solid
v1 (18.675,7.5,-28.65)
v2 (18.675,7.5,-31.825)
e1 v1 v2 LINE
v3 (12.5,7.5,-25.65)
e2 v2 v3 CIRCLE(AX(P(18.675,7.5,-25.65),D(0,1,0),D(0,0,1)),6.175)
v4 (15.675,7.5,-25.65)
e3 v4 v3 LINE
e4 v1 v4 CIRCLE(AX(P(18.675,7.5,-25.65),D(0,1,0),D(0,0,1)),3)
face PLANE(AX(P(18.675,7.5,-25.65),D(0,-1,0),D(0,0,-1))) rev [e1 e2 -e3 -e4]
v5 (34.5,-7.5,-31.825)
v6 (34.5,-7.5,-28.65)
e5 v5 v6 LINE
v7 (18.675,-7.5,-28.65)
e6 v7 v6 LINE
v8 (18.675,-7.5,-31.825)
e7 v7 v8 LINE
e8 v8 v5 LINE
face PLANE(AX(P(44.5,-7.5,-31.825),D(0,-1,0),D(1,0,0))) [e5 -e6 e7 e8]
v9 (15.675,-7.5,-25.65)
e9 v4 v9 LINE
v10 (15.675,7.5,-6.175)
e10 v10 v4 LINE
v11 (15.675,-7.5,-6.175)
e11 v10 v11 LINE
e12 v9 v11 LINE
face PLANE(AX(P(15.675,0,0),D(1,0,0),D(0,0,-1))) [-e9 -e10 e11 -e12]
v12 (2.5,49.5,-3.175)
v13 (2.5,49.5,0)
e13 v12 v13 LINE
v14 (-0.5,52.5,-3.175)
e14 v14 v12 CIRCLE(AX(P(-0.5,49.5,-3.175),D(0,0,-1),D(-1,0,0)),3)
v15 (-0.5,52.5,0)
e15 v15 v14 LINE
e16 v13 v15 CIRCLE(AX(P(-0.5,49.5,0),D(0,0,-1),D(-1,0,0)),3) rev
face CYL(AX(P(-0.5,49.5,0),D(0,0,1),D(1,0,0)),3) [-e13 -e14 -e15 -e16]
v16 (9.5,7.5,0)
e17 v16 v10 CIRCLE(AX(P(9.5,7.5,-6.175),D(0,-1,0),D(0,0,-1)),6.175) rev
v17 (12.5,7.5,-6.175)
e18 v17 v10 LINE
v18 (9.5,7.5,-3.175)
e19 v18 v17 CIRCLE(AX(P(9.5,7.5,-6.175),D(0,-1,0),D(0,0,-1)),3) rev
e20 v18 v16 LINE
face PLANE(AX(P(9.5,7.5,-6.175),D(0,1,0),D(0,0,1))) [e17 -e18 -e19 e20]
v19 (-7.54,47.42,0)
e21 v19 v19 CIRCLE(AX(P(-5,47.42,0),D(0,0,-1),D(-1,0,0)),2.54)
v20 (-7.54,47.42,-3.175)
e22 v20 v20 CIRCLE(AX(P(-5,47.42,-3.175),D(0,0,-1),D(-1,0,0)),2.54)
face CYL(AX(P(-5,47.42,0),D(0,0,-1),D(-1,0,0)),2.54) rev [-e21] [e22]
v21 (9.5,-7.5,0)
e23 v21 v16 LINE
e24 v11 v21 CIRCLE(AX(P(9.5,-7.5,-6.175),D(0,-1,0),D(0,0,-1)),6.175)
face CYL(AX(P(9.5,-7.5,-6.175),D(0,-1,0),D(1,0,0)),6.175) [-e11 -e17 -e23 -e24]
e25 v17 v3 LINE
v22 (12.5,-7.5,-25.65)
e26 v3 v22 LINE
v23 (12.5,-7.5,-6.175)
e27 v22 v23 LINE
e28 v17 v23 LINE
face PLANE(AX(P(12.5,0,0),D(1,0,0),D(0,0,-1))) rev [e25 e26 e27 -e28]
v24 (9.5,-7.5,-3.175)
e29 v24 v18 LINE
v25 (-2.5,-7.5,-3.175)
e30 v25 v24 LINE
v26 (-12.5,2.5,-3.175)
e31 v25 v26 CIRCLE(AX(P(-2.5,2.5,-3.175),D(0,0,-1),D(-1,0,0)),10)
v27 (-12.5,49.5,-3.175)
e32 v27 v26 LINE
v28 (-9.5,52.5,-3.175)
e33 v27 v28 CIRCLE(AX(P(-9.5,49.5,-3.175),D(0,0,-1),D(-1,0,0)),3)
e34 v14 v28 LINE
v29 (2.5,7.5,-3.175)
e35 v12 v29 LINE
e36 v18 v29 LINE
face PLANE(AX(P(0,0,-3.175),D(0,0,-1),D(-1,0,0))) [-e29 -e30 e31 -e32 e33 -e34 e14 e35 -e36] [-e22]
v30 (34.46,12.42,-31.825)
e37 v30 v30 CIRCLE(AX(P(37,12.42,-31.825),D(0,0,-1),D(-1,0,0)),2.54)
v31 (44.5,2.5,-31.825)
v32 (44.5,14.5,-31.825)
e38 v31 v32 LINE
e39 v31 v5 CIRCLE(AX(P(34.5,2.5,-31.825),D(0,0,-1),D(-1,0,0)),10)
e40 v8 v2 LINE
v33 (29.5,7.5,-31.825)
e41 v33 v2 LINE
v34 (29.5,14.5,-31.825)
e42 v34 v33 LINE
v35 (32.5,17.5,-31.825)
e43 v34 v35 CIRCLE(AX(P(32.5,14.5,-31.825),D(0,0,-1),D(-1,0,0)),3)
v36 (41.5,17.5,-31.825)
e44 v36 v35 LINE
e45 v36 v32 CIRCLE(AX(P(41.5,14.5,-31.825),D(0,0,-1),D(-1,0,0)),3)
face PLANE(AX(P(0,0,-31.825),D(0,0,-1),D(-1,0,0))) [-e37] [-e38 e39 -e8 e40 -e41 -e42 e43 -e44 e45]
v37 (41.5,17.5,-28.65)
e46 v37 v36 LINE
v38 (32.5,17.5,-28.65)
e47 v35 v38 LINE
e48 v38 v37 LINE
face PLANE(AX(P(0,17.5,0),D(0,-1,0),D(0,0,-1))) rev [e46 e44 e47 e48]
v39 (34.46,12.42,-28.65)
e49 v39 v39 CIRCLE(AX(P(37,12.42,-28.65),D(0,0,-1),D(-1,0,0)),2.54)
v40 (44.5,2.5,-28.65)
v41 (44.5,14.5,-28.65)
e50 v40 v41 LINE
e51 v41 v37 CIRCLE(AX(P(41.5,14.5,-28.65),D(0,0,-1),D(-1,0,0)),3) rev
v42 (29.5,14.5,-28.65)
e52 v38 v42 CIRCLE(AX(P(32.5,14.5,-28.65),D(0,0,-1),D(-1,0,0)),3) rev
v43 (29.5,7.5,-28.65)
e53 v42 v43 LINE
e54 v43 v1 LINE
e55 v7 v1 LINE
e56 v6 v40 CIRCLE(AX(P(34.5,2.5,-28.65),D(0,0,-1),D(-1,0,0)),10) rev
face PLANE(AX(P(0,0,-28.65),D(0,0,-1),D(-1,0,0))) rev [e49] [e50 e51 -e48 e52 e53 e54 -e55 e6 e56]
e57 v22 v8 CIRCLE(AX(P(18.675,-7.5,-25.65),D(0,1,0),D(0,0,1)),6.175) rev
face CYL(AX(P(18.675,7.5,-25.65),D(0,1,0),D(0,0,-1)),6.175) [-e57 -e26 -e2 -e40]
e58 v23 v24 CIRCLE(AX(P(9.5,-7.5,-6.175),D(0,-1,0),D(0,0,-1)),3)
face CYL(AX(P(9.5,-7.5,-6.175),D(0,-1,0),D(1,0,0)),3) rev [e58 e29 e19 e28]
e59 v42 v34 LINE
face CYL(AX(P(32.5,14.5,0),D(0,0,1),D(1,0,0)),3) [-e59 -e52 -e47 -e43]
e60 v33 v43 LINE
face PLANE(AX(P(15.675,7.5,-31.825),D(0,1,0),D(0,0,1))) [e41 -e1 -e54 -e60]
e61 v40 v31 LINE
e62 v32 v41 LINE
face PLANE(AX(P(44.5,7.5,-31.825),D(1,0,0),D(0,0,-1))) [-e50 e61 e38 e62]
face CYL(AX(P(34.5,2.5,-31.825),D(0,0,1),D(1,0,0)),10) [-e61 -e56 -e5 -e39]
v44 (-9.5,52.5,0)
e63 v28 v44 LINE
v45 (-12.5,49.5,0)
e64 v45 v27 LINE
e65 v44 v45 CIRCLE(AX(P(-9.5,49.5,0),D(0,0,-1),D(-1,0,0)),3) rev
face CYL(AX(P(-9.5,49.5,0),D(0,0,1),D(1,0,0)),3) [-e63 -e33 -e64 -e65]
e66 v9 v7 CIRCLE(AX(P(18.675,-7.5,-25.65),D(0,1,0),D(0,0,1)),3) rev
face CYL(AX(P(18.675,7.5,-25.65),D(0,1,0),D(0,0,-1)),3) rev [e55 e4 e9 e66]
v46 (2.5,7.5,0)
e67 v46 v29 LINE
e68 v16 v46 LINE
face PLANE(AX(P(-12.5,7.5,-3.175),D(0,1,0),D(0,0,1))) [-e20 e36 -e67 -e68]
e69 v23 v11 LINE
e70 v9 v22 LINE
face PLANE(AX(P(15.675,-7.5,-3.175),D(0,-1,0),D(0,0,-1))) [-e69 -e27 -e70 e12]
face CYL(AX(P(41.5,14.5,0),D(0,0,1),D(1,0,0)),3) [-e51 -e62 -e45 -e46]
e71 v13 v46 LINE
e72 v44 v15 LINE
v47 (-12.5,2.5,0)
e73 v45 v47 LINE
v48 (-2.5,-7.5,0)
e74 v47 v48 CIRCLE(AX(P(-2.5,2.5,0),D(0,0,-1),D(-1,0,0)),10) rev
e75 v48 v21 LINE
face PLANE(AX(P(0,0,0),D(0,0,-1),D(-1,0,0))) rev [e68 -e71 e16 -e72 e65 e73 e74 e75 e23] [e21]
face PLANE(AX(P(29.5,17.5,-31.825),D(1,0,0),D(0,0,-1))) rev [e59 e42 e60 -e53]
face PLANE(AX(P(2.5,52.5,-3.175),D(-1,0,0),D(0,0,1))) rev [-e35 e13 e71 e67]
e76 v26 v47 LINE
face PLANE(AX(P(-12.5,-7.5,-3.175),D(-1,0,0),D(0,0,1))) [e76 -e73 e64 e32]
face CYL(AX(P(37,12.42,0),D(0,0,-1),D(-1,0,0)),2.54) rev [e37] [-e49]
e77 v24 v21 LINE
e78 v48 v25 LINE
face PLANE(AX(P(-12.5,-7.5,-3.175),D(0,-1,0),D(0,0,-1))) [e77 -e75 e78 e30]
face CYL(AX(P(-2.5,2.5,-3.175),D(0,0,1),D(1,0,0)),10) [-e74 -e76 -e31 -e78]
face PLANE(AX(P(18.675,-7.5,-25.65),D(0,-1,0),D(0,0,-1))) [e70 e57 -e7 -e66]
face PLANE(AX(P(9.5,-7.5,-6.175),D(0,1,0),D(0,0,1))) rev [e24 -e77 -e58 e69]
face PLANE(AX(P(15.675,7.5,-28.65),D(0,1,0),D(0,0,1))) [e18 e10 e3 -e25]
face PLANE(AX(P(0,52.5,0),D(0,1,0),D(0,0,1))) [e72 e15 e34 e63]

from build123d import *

# Parameters (mm, degrees)
SKETCH1_W                    = 25
SKETCH1_H                    = 15
BASE_FLANGE1_DEPTH           = 3.175
EDGE_FLANGE1_STRIP_W         = 18.7
EDGE_FLANGE1_STRIP_H         = 3.175
EDGE_FLANGE1_STRIP_CUT_DEPTH = 15
EDGE_FLANGE1_DEPTH           = 15
EDGE_FLANGE2_STRIP_W         = 18.7
EDGE_FLANGE2_STRIP_H         = 3.175
EDGE_FLANGE2_STRIP_CUT_DEPTH = 15
EDGE_FLANGE2_DEPTH           = 15
SKETCH12_W                   = 15
SKETCH12_H                   = 3.175
BOSS_EXTRUDE1_DEPTH          = 45
SKETCH15_R                   = 2.54
CUT_EXTRUDE2_DEPTH           = 75.547451331
SKETCH19_W                   = 15
SKETCH19_H                   = 3.175
BOSS_EXTRUDE2_DEPTH          = 10
SKETCH21_R                   = 2.54
CUT_EXTRUDE3_DEPTH           = 76.824340584
FILLET2_R                    = 3
FILLET3_R                    = 10


# Sheet-metal steps are written as plain solids
with BuildPart() as part:
    # Sketch1 → Base-Flange1 (new body)
    with BuildSketch(Plane.XY):
        Rectangle(SKETCH1_W, SKETCH1_H)
    extrude(amount=-BASE_FLANGE1_DEPTH)

    # Edge-Flange1 strip (across the edge) → Edge-Flange1 strip cut (cut)
    with BuildSketch(Plane(origin=(12.5, 7.5, -3.175), x_dir=(-1, 0, 0), z_dir=(0, -1, 0))):
        with Locations((-6.35, -1.5875)):
            Rectangle(EDGE_FLANGE1_STRIP_W, EDGE_FLANGE1_STRIP_H)
    extrude(amount=EDGE_FLANGE1_STRIP_CUT_DEPTH, mode=Mode.SUBTRACT)

    # Edge-Flange1 section (across the edge) → Edge-Flange1 (add)
    with BuildSketch(Plane(origin=(12.5, 7.5, -3.175), x_dir=(-1, 0, 0), z_dir=(0, -1, 0))):
        with BuildLine():
            Line((-3.175, 3), (-3.175, 25.475))
            Line((-3.175, 25.475), (0, 25.475))
            Line((0, 25.475), (0, 3))
            ThreePointArc((0, 3), (0.878679656, 0.878679656), (3, 0))
            Line((3, 0), (3, -3.175))
            ThreePointArc((3, -3.175), (-1.366384374, -1.366384374), (-3.175, 3))
        make_face()
    extrude(amount=EDGE_FLANGE1_DEPTH)

    # Edge-Flange2 strip (across the edge) → Edge-Flange2 strip cut (cut)
    with BuildSketch(Plane(origin=(15.675, -7.5, -28.65), x_dir=(0, 0, 1), z_dir=(0, 1, 0))):
        with Locations((-6.35, -1.5875)):
            Rectangle(EDGE_FLANGE2_STRIP_W, EDGE_FLANGE2_STRIP_H)
    extrude(amount=EDGE_FLANGE2_STRIP_CUT_DEPTH, mode=Mode.SUBTRACT)

    # Edge-Flange2 section (across the edge) → Edge-Flange2 (add)
    with BuildSketch(Plane(origin=(15.675, -7.5, -28.65), x_dir=(0, 0, 1), z_dir=(0, 1, 0))):
        with BuildLine():
            Line((-3.175, 3), (-3.175, 28.825))
            Line((-3.175, 28.825), (0, 28.825))
            Line((0, 28.825), (0, 3))
            ThreePointArc((0, 3), (0.878679656, 0.878679656), (3, 0))
            Line((3, 0), (3, -3.175))
            ThreePointArc((3, -3.175), (-1.366384374, -1.366384374), (-3.175, 3))
        make_face()
    extrude(amount=EDGE_FLANGE2_DEPTH)

    # Sketch12 → Boss-Extrude1 (add)
    with BuildSketch(Plane(origin=(0, 7.5, 0), x_dir=(1, 0, 0), z_dir=(0, 1, 0))):
        with Locations((-5, 1.5875)):
            Rectangle(SKETCH12_W, SKETCH12_H)
    extrude(amount=BOSS_EXTRUDE1_DEPTH)

    # Sketch15 → Cut-Extrude2 (cut, through all)
    with BuildSketch(Plane(origin=(0, 0, -3.175), x_dir=(-1, 0, 0), z_dir=(0, 0, -1))):
        with Locations((5, 47.42)):
            Circle(SKETCH15_R)
    extrude(amount=-CUT_EXTRUDE2_DEPTH, mode=Mode.SUBTRACT)

    # Sketch19 → Boss-Extrude2 (add)
    with BuildSketch(Plane(origin=(0, 7.5, 0), x_dir=(1, 0, 0), z_dir=(0, 1, 0))):
        with Locations((37, 30.2375)):
            Rectangle(SKETCH19_W, SKETCH19_H)
    extrude(amount=BOSS_EXTRUDE2_DEPTH)

    # Sketch21 → Cut-Extrude3 (cut, through all)
    with BuildSketch(Plane(origin=(0, 0, -31.825), x_dir=(-1, 0, 0), z_dir=(0, 0, -1))):
        with Locations((-37, 12.42)):
            Circle(SKETCH21_R)
    extrude(amount=-CUT_EXTRUDE3_DEPTH, mode=Mode.SUBTRACT)

    # Fillet2
    fillet2_edges = [part.edges().sort_by_distance(p)[0] for p in [
        (44.5, 17.5, -30.2375),
        (29.5, 17.5, -30.2375),
        (-12.5, 52.5, -1.5875),
        (2.5, 52.5, -1.5875),
    ]]
    fillet(fillet2_edges, radius=FILLET2_R)

    # Fillet3
    fillet3_edges = [part.edges().sort_by_distance(p)[0] for p in [
        (44.5, -7.5, -30.2375),
        (-12.5, -7.5, -1.5875),
    ]]
    fillet(fillet3_edges, radius=FILLET3_R)


solid = part.part
